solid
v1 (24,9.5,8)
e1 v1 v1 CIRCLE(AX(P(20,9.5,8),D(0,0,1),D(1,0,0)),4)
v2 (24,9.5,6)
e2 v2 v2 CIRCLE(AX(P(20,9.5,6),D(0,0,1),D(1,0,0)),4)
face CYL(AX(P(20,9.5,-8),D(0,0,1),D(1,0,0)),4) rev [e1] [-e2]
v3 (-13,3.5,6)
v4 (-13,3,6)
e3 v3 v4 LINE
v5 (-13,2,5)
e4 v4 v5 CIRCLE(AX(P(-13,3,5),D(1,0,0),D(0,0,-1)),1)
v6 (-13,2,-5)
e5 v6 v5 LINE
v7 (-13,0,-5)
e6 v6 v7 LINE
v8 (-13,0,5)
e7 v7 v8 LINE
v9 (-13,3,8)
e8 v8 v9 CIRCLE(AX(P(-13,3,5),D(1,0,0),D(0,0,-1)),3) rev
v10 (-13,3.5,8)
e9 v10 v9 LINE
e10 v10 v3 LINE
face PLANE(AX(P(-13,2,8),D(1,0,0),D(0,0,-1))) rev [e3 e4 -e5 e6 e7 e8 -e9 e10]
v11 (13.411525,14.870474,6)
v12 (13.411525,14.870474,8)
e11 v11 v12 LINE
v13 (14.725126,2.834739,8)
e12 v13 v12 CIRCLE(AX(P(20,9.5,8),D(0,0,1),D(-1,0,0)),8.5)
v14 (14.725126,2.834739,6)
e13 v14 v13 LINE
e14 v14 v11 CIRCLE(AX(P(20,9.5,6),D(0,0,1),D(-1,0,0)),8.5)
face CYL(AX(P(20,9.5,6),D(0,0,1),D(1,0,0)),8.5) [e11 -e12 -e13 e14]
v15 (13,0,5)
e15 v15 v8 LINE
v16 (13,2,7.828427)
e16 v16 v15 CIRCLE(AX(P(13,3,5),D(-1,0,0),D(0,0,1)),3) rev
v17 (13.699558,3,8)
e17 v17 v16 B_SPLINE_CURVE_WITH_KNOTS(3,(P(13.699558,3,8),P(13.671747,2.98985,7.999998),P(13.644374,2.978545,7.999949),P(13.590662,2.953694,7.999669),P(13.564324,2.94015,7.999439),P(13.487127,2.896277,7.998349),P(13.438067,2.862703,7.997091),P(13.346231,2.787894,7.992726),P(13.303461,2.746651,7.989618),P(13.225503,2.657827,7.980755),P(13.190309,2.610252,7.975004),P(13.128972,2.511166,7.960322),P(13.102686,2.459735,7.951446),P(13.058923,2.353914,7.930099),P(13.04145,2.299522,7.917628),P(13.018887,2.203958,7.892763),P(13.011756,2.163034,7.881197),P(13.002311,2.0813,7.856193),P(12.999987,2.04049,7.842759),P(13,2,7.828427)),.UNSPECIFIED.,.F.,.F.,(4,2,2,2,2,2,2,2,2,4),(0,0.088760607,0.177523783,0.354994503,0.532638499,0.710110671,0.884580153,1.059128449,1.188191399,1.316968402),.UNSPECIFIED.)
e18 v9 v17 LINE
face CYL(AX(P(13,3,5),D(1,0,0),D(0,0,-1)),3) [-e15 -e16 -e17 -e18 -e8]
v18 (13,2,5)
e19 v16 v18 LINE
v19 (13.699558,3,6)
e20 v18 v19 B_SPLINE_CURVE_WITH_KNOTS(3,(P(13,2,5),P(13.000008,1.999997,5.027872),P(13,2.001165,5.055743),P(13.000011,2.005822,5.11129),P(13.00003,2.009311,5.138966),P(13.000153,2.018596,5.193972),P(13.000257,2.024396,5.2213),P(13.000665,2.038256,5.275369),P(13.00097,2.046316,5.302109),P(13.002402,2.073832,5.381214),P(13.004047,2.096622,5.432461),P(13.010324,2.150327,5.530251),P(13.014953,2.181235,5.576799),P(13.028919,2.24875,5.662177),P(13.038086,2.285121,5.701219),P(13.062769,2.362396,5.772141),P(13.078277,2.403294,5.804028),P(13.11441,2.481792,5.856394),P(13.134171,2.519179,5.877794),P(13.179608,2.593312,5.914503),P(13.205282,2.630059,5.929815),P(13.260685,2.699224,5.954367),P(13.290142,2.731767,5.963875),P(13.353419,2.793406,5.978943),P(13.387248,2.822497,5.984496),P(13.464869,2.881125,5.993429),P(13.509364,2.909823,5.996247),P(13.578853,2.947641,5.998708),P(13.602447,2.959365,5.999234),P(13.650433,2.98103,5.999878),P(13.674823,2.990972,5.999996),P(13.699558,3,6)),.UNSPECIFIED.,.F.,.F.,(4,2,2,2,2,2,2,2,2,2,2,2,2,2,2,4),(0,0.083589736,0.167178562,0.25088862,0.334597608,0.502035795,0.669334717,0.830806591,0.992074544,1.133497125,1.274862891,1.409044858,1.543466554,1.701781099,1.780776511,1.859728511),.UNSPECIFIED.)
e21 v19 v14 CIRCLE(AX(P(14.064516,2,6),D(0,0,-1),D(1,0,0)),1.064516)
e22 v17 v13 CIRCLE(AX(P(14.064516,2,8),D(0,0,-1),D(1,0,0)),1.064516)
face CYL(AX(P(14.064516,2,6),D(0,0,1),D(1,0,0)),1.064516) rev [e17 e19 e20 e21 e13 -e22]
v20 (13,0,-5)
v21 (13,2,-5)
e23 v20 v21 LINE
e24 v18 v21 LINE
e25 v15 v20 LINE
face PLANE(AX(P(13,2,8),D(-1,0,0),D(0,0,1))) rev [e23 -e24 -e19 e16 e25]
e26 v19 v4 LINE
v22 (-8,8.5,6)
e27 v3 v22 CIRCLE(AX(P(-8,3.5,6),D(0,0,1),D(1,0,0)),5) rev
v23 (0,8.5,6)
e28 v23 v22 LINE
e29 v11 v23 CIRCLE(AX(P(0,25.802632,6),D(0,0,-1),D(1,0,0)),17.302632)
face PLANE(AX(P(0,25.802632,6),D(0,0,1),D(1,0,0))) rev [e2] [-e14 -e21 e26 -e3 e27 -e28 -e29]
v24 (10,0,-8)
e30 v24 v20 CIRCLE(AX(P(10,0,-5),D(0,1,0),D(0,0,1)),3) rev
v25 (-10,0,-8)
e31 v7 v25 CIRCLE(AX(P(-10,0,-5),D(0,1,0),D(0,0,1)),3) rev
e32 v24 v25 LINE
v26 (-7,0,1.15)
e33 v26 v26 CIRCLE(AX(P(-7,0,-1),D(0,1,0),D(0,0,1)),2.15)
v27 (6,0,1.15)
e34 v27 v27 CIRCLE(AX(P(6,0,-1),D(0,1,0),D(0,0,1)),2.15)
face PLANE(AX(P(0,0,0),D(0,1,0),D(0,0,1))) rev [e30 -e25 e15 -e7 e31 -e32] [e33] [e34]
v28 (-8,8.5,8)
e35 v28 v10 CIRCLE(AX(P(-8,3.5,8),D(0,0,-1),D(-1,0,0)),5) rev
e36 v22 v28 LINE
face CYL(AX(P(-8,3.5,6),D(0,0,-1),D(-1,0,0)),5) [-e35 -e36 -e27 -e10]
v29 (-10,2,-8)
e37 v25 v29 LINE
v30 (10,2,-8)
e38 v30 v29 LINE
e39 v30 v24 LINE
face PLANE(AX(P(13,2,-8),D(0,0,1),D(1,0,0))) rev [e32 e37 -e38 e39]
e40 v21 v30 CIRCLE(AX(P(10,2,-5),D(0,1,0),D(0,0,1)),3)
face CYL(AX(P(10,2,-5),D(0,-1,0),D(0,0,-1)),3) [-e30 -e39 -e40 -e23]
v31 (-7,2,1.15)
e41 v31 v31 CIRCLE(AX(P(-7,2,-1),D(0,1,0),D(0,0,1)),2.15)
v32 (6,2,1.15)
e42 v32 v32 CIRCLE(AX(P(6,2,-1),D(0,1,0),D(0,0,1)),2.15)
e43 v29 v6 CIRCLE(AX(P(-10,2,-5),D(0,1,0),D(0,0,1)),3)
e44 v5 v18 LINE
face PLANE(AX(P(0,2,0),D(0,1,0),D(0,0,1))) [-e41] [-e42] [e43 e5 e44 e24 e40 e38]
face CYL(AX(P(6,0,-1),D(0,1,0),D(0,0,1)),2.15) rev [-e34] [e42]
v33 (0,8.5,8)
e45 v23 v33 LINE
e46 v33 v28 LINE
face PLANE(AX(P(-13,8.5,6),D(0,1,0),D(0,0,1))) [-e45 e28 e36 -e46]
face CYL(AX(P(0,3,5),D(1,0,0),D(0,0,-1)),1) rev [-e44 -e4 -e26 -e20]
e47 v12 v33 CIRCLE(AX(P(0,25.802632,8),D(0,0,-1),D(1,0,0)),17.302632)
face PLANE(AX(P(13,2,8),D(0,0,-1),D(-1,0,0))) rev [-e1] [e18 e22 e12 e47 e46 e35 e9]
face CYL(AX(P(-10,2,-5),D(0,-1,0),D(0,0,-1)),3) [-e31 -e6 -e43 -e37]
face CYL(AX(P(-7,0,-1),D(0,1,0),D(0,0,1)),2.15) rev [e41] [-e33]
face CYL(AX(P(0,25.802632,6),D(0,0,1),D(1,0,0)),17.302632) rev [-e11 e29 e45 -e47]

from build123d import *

# Parameters (mm, degrees)
SKETCH_1_W          = 26
SKETCH_1_H          = 16
EXTRUDE_1_DEPTH     = 2
EXTRUDE_2_DEPTH     = 2
FILLET_1_R          = 5
FILLET_2_R          = 3
SKETCH_4_R          = 4
CUT_EXTRUDE_1_DEPTH = 38.312866414
SKETCH_5_R          = 2.15
CUT_EXTRUDE_2_DEPTH = 34.648922717
FILLET_3_R          = 3
FILLET_START        = -13
FILLET_4_DEPTH      = 26.69955789
FILLET_START_2      = 4
FILLET_4_2_DEPTH    = 2


with BuildPart() as part:
    # 草图1 → 凸台-拉伸1 (new body)
    with BuildSketch(Plane(origin=(0, 0, 0), x_dir=(1, 0, 0), z_dir=(0, 1, 0))):
        Rectangle(SKETCH_1_W, SKETCH_1_H)
    extrude(amount=EXTRUDE_1_DEPTH)

    # 草图3 → 凸台-拉伸2 (add)
    with BuildSketch(Plane.XY.offset(8)):
        with BuildLine():
            Line((-13, 2), (-13, 8.5))
            Line((-13, 8.5), (0, 8.5))
            ThreePointArc((0, 8.5), (7.423811989, 10.173553708), (13.411524732, 14.870474248))
            ThreePointArc((13.411524732, 14.870474248), (28.449822139, 10.422228722), (14.725126476, 2.834738617))
            ThreePointArc((14.725126476, 2.834738617), (13.600854496, 2.958234042), (13, 2))
            Line((13, 2), (-13, 2))
        make_face()
    extrude(amount=-EXTRUDE_2_DEPTH)

    # 圆角1
    fillet_1_edges = [part.edges().sort_by_distance(p)[0] for p in [
        (-13, 8.5, 7),
    ]]
    fillet(fillet_1_edges, radius=FILLET_1_R)

    # 圆角2
    fillet_2_edges = [part.edges().sort_by_distance(p)[0] for p in [
        (-13, 1, -8),
        (13, 1, -8),
    ]]
    fillet(fillet_2_edges, radius=FILLET_2_R)

    # 草图4 → 切除-拉伸1 (cut, through all)
    with BuildSketch(Plane.XY.offset(8)):
        with Locations((20, 9.5)):
            Circle(SKETCH_4_R)
    extrude(amount=-CUT_EXTRUDE_1_DEPTH, mode=Mode.SUBTRACT)

    # 草图5 → 切除-拉伸2 (cut, through all)
    with BuildSketch(Plane(origin=(0, 2, 0), x_dir=(1, 0, 0), z_dir=(0, 1, 0))):
        with Locations(Location((-7, 1, 0), (0, 0, 270))):
            Circle(SKETCH_5_R)
        with Locations(Location((6, 1, 0), (0, 0, 270))):
            Circle(SKETCH_5_R)
    extrude(amount=-CUT_EXTRUDE_2_DEPTH, mode=Mode.SUBTRACT)

    # 圆角3
    fillet_3_edges = [part.edges().sort_by_distance(p)[0] for p in [
        (0, 0, 8),
    ]]
    fillet(fillet_3_edges, radius=FILLET_3_R)

    # 圆角4: read off the stored shape, not the designer's step
    # 圆角4 outline → 圆角4 (add)
    with BuildSketch(Plane.YZ.offset(FILLET_START)):
        with BuildLine():
            ThreePointArc((2, 5), (2.292893219, 5.707106781), (3, 6))
            Line((3, 6), (2, 6))
            Line((2, 6), (2, 5))
        make_face()
    extrude(amount=FILLET_4_DEPTH)

    # Fillet 4 2 outline → Fillet 4 2 (cut)
    with BuildSketch(Plane.XY.offset(FILLET_START_2)):
        with BuildLine():
            Line((13.69955789, 2), (13.699557878, 3.000000032))
            ThreePointArc((13.699557878, 3.000000032), (13.19224914, 2.610200695), (13, 1.999999133))
            Line((13, 1.999999133), (13.69955789, 2))
        make_face()
    extrude(amount=FILLET_4_2_DEPTH, mode=Mode.SUBTRACT)


solid = part.part
